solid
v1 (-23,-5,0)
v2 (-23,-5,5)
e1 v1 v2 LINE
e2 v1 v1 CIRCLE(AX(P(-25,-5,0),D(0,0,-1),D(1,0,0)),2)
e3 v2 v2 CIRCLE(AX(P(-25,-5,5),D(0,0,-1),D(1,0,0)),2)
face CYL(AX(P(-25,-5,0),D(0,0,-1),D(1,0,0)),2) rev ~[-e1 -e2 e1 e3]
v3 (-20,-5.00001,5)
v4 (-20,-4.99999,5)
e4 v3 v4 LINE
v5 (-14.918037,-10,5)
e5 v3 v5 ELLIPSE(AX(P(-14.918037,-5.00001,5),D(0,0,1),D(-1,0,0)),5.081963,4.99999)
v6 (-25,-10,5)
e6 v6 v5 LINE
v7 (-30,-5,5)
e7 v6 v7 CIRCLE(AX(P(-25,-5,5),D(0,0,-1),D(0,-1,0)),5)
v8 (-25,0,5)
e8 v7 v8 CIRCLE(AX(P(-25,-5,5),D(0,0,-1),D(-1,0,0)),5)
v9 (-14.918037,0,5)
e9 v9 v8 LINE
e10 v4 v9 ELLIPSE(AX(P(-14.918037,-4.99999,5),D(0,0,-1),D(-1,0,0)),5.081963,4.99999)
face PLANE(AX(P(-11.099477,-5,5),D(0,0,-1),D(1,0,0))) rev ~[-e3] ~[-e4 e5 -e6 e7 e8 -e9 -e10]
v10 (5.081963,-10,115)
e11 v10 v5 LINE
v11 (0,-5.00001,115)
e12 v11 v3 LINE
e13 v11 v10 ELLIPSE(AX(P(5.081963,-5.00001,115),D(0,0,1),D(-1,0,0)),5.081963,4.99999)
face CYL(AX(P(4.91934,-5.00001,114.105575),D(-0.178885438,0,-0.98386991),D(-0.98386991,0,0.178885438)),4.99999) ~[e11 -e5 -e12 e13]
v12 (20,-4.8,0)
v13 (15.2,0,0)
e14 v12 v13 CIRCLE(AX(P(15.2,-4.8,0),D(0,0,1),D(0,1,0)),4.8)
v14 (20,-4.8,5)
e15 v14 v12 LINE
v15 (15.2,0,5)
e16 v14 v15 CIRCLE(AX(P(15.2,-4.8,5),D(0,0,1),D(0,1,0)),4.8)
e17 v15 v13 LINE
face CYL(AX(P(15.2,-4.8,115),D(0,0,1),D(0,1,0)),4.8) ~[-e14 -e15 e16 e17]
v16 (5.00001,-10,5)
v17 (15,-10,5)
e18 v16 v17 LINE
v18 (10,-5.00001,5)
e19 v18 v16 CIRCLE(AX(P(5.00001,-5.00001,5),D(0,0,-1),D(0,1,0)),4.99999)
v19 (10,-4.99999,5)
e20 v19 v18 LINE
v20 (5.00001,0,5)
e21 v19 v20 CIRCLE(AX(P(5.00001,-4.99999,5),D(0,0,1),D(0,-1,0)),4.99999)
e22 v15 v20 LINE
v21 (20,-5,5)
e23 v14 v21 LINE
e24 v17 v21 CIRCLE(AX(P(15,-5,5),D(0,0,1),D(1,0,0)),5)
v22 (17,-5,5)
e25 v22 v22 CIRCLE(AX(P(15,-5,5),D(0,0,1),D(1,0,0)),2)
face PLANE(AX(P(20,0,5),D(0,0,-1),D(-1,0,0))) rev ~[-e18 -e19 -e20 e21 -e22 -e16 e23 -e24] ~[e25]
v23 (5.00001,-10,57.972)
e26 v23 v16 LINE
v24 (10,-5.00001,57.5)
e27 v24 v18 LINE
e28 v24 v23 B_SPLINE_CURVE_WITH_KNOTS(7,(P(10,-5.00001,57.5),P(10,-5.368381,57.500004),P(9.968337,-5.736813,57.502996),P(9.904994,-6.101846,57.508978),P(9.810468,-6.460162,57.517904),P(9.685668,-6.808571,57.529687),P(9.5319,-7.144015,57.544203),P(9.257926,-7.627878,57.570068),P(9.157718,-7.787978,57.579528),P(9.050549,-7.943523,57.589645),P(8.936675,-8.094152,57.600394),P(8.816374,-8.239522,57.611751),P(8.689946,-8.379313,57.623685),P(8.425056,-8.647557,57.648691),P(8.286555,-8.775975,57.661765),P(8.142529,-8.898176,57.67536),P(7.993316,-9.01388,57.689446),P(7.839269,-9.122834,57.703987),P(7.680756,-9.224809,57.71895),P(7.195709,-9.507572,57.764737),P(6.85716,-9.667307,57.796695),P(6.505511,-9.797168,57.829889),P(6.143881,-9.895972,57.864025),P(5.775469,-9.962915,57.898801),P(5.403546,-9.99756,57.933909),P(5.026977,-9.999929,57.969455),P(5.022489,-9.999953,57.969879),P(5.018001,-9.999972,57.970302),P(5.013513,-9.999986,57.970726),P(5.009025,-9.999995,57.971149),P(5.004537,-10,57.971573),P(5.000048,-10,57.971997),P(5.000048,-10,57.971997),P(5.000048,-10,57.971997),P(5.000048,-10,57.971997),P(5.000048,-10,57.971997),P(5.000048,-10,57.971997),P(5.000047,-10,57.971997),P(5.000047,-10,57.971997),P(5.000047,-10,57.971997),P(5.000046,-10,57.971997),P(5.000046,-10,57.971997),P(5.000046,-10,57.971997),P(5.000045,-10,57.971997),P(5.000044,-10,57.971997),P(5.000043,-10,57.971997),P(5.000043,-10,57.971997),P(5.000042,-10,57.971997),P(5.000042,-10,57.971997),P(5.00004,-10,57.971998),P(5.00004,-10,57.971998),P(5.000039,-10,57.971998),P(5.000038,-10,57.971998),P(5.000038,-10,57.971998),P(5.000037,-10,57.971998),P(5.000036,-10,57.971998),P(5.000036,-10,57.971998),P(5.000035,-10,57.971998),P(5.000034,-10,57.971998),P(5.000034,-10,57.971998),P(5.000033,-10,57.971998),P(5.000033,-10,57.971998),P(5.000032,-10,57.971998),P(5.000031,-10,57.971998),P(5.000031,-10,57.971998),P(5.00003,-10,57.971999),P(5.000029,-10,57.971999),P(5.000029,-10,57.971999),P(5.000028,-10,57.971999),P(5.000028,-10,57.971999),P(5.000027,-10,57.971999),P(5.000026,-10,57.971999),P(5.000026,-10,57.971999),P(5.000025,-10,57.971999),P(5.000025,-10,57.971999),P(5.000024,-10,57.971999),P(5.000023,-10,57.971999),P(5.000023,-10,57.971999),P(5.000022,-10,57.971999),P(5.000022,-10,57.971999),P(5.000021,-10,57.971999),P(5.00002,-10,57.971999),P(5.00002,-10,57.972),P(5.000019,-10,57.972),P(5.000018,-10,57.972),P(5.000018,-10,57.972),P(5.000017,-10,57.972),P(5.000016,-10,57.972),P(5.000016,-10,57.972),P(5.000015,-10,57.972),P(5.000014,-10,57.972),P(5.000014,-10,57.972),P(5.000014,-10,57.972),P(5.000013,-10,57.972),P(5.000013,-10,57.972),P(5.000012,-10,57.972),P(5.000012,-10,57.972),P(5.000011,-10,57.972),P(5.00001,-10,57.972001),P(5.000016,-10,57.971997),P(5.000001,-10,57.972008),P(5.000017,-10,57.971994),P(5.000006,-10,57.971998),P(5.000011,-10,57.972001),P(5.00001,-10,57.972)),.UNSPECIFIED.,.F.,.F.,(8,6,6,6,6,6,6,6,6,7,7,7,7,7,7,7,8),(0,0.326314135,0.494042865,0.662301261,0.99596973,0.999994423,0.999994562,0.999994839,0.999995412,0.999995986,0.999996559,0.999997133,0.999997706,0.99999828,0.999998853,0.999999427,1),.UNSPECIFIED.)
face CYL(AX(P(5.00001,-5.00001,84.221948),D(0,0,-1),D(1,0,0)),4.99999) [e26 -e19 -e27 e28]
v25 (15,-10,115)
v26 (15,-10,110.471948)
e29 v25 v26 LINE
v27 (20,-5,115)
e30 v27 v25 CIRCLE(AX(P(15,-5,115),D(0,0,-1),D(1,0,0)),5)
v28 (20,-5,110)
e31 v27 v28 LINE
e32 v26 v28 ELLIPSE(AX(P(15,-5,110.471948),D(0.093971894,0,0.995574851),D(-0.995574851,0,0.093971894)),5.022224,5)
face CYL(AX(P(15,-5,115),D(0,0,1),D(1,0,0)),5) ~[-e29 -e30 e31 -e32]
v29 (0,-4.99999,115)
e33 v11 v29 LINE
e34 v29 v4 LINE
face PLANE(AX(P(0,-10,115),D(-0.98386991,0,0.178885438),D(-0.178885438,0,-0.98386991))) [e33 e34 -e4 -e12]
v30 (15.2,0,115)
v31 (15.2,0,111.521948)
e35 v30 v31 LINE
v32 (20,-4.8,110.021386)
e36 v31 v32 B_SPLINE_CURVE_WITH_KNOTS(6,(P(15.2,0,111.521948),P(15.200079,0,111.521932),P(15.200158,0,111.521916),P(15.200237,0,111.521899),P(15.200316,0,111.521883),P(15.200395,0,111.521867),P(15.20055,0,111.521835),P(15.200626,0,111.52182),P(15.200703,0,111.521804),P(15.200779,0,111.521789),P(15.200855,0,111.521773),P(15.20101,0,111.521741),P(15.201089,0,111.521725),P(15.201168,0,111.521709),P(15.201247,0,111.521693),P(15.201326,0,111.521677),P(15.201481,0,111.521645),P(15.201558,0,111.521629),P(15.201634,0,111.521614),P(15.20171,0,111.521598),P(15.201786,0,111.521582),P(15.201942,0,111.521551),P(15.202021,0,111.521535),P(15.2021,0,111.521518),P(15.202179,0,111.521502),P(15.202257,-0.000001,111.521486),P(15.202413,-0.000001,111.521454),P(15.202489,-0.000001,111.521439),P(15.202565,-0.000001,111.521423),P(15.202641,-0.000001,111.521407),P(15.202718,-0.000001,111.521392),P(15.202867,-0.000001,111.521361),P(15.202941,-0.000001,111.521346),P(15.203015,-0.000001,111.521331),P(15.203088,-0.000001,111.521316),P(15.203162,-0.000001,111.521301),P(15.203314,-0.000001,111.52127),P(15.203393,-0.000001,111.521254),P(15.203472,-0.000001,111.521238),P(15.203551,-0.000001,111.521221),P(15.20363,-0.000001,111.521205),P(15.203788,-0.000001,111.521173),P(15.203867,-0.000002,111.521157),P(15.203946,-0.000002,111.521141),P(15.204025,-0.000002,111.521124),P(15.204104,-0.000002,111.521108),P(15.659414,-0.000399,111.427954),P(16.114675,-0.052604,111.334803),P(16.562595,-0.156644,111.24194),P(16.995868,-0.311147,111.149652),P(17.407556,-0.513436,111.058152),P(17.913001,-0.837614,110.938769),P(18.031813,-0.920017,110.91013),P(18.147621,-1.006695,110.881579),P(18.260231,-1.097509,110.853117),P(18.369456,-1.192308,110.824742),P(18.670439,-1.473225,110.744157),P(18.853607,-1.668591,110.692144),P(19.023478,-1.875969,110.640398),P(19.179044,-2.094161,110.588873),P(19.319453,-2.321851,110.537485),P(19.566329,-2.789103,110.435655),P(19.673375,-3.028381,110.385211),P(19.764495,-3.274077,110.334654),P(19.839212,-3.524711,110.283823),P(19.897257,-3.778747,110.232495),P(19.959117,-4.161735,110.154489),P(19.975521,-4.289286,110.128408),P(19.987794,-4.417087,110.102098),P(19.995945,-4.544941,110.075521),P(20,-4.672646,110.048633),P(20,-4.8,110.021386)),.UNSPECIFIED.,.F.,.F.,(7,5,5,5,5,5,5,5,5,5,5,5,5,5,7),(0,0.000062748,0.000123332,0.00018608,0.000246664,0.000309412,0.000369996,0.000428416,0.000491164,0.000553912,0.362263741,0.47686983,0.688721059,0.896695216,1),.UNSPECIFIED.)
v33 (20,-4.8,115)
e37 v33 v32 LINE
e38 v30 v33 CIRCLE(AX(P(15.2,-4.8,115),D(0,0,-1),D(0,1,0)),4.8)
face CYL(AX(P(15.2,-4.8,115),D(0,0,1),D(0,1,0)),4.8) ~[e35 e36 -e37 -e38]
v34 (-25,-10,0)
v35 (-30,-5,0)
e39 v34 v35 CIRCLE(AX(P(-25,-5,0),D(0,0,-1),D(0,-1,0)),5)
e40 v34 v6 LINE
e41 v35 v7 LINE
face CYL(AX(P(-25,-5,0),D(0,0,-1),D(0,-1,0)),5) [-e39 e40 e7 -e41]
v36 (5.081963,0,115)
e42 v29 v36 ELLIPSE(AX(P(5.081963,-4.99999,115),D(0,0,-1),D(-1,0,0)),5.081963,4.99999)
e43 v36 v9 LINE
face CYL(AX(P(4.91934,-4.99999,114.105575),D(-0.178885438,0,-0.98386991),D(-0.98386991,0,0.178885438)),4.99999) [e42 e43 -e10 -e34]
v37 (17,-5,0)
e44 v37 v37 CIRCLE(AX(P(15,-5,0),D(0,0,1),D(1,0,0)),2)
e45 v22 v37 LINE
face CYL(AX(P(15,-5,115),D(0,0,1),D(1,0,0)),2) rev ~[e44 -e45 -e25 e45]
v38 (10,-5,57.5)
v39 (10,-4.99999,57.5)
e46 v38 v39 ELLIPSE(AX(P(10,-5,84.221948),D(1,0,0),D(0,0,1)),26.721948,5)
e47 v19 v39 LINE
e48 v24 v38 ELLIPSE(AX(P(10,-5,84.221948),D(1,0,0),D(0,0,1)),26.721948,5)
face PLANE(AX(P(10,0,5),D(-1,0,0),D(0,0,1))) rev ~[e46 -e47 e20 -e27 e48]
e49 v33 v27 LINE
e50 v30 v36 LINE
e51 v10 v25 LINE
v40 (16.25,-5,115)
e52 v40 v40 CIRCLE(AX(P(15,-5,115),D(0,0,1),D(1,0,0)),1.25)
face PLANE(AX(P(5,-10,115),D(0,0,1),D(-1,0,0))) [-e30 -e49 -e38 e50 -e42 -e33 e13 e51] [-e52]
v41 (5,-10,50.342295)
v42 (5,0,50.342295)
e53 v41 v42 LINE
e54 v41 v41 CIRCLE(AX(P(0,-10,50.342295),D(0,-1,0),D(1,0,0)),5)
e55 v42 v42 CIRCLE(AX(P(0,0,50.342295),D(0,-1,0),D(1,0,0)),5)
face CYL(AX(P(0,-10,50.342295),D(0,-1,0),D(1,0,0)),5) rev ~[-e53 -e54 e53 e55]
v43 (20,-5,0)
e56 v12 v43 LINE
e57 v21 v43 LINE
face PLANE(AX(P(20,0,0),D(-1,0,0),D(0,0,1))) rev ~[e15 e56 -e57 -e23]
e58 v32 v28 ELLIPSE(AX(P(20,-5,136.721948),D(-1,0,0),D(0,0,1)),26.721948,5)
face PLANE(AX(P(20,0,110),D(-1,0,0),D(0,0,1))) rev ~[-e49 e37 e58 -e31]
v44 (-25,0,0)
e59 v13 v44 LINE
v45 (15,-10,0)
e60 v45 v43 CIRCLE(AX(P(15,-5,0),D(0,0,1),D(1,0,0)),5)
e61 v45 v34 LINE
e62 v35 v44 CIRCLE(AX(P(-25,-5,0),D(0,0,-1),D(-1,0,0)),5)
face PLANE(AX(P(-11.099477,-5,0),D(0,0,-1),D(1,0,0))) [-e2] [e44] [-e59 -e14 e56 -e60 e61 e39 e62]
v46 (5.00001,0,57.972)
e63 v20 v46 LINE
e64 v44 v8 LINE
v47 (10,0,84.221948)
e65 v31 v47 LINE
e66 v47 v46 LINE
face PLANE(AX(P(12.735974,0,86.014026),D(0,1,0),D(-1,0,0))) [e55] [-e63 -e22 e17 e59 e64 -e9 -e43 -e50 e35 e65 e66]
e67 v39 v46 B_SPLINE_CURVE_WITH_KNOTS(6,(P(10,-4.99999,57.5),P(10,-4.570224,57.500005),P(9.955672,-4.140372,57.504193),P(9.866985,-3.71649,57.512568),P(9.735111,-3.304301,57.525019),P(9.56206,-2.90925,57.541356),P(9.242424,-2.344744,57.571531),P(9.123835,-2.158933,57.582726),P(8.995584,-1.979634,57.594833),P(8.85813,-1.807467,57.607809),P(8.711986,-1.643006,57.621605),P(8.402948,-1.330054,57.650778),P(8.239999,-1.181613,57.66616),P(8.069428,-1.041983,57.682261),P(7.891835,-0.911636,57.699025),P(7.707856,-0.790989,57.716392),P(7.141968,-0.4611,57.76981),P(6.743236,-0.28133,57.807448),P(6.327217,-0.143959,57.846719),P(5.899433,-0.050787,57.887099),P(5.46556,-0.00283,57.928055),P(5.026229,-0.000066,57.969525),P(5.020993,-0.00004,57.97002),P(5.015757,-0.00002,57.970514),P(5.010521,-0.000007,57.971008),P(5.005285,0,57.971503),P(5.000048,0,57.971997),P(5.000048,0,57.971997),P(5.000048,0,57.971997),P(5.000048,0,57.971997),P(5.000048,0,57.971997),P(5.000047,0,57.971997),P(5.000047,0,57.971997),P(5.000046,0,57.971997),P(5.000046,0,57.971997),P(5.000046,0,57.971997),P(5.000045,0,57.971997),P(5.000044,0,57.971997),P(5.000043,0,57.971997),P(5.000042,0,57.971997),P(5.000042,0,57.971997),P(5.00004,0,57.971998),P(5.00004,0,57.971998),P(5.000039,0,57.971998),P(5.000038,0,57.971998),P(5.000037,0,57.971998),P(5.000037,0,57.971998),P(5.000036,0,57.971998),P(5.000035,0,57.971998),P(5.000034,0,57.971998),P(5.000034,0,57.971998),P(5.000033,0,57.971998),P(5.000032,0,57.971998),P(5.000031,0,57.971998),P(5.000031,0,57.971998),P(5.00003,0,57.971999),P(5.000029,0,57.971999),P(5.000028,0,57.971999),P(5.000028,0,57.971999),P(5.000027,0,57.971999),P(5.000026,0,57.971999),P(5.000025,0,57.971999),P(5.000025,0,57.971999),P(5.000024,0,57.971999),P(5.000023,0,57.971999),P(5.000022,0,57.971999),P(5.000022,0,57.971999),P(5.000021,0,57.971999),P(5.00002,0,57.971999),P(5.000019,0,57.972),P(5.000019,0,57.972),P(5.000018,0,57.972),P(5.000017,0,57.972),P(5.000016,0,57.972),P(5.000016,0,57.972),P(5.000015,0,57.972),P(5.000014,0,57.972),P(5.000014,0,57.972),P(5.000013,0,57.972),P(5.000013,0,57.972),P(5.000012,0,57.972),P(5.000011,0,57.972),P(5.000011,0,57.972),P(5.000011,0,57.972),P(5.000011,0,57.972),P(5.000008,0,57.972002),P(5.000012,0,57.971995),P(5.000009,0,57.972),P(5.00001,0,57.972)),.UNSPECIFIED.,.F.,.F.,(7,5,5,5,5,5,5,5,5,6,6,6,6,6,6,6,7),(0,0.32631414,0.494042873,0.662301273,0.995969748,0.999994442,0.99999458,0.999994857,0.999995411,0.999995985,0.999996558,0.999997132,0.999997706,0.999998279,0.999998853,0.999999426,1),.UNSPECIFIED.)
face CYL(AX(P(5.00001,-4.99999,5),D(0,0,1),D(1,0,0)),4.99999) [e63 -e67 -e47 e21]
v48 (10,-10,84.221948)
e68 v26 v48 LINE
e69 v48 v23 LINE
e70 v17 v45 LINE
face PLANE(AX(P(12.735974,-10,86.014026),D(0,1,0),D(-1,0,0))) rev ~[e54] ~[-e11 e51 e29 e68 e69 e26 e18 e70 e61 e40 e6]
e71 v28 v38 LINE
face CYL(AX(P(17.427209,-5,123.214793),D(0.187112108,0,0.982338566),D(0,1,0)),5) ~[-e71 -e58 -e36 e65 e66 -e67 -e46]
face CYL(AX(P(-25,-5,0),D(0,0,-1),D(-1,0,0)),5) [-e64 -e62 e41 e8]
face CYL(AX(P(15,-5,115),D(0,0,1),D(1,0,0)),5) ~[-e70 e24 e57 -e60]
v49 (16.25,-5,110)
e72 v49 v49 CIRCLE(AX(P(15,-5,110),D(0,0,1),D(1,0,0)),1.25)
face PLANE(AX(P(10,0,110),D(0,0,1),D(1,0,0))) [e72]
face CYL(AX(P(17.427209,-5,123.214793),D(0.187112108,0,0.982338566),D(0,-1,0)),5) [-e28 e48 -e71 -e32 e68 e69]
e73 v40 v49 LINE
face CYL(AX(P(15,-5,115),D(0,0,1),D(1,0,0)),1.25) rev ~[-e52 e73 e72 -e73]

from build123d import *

# Parameters (mm, degrees)
F1_DEPTH     = 10
F2_R         = 2
F3_DEPTH     = 115.001
F4_R         = 2
F4_R_2       = 1.25
F5_DEPTH     = 5
F6_R         = 2
F7_DEPTH     = 5
F9_DEPTH     = 10
F10_R        = 4.99999
F11_R        = 5
F12_DEPTH    = 10.001
F14_DEPTH    = 10
F15_T4_DEPTH = 78.4438958161
F15_T9_DEPTH = 78.4438958161
F16_R        = 4.99999


# Not quite as in the source:
# - a fillet or chamfer that OpenCascade refuses, or shapes differently, is made with other operations: its cross-section is extruded or revolved along the edge and cut away or added
# - a fillet or chamfer is up to 0.001 mm smaller than in the source, because OpenCascade refuses the exact size


with BuildPart() as f1:
    # F0 (on Front) → F1 (new body)
    with BuildSketch(Plane.XZ):
        Polygon((0, 115), (0, 0), (10, 0), (20, 0), (20, 5), (10, 5), (10, 110), (20, 110), (20, 115), (10, 115), align=None)
    extrude(amount=F1_DEPTH)

    # F2 (on face) → F3 (cut, through all)
    with BuildSketch(Plane.XY.offset(115)):
        with BuildLine():
            Line((0, -10), (5, -10))
            ThreePointArc((5, -10), (1.4644660941, -8.5355339059), (0, -5))
            Line((0, -5), (0, -10))
        make_face()
        with BuildLine():
            Line((0, 0), (0, -5))
            ThreePointArc((0, -5), (1.4644660941, -1.4644660941), (5, 0))
            Line((5, 0), (0, 0))
        make_face()
        with BuildLine():
            ThreePointArc((15.2, 0), (18.5941125497, -1.4058874503), (20, -4.8))
            Line((20, -4.8), (20, 0))
            Line((20, 0), (15.2, 0))
        make_face()
        with BuildLine():
            ThreePointArc((20, -5), (18.5355339059, -8.5355339059), (15, -10))
            Line((15, -10), (20, -10))
            Line((20, -10), (20, -5))
        make_face()
        with Locations((15, -5)):
            Circle(F2_R)
    extrude(amount=-F3_DEPTH, mode=Mode.SUBTRACT)

    # F4 (on face) → F5 (join)
    with BuildSketch(Plane.XY.offset(115)):
        with Locations((15, -5)):
            Circle(F4_R)
        with Locations((15, -5)):
            Circle(F4_R_2, mode=Mode.SUBTRACT)
    extrude(amount=-F5_DEPTH)

    # F6 (on face) → F7 (join)
    with BuildSketch(Plane(origin=(0, 0, 0), x_dir=(1, 0, 0), z_dir=(0, 0, -1))):
        with BuildLine():
            Line((-25, 0), (5, 0))
            ThreePointArc((5, 0), (0, 5), (5, 10))
            Line((5, 10), (-25, 10))
            ThreePointArc((-25, 10), (-28.5355339059, 8.5355339059), (-30, 5))
            ThreePointArc((-30, 5), (-28.5355339059, 1.4644660941), (-25, 0))
        make_face()
        with Locations((-25, 5)):
            Circle(F6_R, mode=Mode.SUBTRACT)
    extrude(amount=-F7_DEPTH)

    # F8 (on face) → F9 (join)
    with BuildSketch(Plane.XZ.offset(10)):
        Polygon((0, 115), (-20, 5), (5, 5), (5, 115), align=None)
    extrude(amount=-F9_DEPTH)

    # F10 (radius 5 in the source; OpenCascade refuses exactly that, so slightly less here)
    f10_edges = [f1.edges().sort_by_distance(p)[0] for p in [
        (-10, 0, 60),
        (-10, -10, 60),
    ]]
    fillet(f10_edges, radius=F10_R)

    # F11 (on face) → F12 (cut, through all)
    with BuildSketch(Plane.XZ.offset(10)):
        with Locations((0, 50.3422953188)):
            Circle(F11_R)
    extrude(amount=-F12_DEPTH, mode=Mode.SUBTRACT)

    # F13 (on face) → F14 (join)
    with BuildSketch(Plane(origin=(0, 0, 0), x_dir=(-1, 0, 0), z_dir=(0, 1, 0))):
        Polygon((-20, 110), (-10, 57.5), (-10, 110), (-15.2, 110), align=None)
    extrude(amount=-F14_DEPTH)

    # F15: fillet of radius 5 on 2 edges, made by hand


with BuildPart() as f15_tool2:
    # F15_s3 → F15_t4 (new body)
    with BuildSketch(Plane(origin=(23.2579385477, 0, 122.1041773757), x_dir=(0, 1, 0), z_dir=(-0.1871121079, 0, -0.9823385664))):
        with BuildLine():
            ThreePointArc((0, -5.9355605394), (-1.4644660941, -2.4000266335), (-5, -0.9355605394))
            Line((-5, -0.9355605394), (0, -0.9355605394))
            Line((0, -0.9355605394), (0, -5.9355605394))
        make_face()
    extrude(amount=F15_T4_DEPTH)

    split(bisect_by=Plane.YZ.offset(10), keep=Keep.TOP)


with BuildPart() as f1_1:
    add(f1.part)

    # F15_t1: cut F15_tool2
    add(f15_tool2.part, mode=Mode.SUBTRACT)


with BuildPart() as f15_tool7:
    # F15_s8 → F15_t9 (new body)
    with BuildSketch(Plane(origin=(23.2579385477, 0, 122.1041773757), x_dir=(0, 1, 0), z_dir=(-0.1871121079, 0, -0.9823385664))):
        with BuildLine():
            ThreePointArc((-10, -5.9355605394), (-8.5355339059, -2.4000266335), (-5, -0.9355605394))
            Line((-5, -0.9355605394), (-10, -0.9355605394))
            Line((-10, -0.9355605394), (-10, -5.9355605394))
        make_face()
    extrude(amount=F15_T9_DEPTH)

    split(bisect_by=Plane.YZ.offset(10), keep=Keep.TOP)


with BuildPart() as f1_2:
    add(f1_1.part)

    # F15_t6: cut F15_tool7
    add(f15_tool7.part, mode=Mode.SUBTRACT)

    # F16 (radius 5 in the source; OpenCascade refuses exactly that, so slightly less here)
    f16_edges = [f1_2.edges().sort_by_distance(p)[0] for p in [
        (10, 0, 44.610974),
        (10, -10, 44.610974),
    ]]
    fillet(f16_edges, radius=F16_R)


solid = f1_2.part
